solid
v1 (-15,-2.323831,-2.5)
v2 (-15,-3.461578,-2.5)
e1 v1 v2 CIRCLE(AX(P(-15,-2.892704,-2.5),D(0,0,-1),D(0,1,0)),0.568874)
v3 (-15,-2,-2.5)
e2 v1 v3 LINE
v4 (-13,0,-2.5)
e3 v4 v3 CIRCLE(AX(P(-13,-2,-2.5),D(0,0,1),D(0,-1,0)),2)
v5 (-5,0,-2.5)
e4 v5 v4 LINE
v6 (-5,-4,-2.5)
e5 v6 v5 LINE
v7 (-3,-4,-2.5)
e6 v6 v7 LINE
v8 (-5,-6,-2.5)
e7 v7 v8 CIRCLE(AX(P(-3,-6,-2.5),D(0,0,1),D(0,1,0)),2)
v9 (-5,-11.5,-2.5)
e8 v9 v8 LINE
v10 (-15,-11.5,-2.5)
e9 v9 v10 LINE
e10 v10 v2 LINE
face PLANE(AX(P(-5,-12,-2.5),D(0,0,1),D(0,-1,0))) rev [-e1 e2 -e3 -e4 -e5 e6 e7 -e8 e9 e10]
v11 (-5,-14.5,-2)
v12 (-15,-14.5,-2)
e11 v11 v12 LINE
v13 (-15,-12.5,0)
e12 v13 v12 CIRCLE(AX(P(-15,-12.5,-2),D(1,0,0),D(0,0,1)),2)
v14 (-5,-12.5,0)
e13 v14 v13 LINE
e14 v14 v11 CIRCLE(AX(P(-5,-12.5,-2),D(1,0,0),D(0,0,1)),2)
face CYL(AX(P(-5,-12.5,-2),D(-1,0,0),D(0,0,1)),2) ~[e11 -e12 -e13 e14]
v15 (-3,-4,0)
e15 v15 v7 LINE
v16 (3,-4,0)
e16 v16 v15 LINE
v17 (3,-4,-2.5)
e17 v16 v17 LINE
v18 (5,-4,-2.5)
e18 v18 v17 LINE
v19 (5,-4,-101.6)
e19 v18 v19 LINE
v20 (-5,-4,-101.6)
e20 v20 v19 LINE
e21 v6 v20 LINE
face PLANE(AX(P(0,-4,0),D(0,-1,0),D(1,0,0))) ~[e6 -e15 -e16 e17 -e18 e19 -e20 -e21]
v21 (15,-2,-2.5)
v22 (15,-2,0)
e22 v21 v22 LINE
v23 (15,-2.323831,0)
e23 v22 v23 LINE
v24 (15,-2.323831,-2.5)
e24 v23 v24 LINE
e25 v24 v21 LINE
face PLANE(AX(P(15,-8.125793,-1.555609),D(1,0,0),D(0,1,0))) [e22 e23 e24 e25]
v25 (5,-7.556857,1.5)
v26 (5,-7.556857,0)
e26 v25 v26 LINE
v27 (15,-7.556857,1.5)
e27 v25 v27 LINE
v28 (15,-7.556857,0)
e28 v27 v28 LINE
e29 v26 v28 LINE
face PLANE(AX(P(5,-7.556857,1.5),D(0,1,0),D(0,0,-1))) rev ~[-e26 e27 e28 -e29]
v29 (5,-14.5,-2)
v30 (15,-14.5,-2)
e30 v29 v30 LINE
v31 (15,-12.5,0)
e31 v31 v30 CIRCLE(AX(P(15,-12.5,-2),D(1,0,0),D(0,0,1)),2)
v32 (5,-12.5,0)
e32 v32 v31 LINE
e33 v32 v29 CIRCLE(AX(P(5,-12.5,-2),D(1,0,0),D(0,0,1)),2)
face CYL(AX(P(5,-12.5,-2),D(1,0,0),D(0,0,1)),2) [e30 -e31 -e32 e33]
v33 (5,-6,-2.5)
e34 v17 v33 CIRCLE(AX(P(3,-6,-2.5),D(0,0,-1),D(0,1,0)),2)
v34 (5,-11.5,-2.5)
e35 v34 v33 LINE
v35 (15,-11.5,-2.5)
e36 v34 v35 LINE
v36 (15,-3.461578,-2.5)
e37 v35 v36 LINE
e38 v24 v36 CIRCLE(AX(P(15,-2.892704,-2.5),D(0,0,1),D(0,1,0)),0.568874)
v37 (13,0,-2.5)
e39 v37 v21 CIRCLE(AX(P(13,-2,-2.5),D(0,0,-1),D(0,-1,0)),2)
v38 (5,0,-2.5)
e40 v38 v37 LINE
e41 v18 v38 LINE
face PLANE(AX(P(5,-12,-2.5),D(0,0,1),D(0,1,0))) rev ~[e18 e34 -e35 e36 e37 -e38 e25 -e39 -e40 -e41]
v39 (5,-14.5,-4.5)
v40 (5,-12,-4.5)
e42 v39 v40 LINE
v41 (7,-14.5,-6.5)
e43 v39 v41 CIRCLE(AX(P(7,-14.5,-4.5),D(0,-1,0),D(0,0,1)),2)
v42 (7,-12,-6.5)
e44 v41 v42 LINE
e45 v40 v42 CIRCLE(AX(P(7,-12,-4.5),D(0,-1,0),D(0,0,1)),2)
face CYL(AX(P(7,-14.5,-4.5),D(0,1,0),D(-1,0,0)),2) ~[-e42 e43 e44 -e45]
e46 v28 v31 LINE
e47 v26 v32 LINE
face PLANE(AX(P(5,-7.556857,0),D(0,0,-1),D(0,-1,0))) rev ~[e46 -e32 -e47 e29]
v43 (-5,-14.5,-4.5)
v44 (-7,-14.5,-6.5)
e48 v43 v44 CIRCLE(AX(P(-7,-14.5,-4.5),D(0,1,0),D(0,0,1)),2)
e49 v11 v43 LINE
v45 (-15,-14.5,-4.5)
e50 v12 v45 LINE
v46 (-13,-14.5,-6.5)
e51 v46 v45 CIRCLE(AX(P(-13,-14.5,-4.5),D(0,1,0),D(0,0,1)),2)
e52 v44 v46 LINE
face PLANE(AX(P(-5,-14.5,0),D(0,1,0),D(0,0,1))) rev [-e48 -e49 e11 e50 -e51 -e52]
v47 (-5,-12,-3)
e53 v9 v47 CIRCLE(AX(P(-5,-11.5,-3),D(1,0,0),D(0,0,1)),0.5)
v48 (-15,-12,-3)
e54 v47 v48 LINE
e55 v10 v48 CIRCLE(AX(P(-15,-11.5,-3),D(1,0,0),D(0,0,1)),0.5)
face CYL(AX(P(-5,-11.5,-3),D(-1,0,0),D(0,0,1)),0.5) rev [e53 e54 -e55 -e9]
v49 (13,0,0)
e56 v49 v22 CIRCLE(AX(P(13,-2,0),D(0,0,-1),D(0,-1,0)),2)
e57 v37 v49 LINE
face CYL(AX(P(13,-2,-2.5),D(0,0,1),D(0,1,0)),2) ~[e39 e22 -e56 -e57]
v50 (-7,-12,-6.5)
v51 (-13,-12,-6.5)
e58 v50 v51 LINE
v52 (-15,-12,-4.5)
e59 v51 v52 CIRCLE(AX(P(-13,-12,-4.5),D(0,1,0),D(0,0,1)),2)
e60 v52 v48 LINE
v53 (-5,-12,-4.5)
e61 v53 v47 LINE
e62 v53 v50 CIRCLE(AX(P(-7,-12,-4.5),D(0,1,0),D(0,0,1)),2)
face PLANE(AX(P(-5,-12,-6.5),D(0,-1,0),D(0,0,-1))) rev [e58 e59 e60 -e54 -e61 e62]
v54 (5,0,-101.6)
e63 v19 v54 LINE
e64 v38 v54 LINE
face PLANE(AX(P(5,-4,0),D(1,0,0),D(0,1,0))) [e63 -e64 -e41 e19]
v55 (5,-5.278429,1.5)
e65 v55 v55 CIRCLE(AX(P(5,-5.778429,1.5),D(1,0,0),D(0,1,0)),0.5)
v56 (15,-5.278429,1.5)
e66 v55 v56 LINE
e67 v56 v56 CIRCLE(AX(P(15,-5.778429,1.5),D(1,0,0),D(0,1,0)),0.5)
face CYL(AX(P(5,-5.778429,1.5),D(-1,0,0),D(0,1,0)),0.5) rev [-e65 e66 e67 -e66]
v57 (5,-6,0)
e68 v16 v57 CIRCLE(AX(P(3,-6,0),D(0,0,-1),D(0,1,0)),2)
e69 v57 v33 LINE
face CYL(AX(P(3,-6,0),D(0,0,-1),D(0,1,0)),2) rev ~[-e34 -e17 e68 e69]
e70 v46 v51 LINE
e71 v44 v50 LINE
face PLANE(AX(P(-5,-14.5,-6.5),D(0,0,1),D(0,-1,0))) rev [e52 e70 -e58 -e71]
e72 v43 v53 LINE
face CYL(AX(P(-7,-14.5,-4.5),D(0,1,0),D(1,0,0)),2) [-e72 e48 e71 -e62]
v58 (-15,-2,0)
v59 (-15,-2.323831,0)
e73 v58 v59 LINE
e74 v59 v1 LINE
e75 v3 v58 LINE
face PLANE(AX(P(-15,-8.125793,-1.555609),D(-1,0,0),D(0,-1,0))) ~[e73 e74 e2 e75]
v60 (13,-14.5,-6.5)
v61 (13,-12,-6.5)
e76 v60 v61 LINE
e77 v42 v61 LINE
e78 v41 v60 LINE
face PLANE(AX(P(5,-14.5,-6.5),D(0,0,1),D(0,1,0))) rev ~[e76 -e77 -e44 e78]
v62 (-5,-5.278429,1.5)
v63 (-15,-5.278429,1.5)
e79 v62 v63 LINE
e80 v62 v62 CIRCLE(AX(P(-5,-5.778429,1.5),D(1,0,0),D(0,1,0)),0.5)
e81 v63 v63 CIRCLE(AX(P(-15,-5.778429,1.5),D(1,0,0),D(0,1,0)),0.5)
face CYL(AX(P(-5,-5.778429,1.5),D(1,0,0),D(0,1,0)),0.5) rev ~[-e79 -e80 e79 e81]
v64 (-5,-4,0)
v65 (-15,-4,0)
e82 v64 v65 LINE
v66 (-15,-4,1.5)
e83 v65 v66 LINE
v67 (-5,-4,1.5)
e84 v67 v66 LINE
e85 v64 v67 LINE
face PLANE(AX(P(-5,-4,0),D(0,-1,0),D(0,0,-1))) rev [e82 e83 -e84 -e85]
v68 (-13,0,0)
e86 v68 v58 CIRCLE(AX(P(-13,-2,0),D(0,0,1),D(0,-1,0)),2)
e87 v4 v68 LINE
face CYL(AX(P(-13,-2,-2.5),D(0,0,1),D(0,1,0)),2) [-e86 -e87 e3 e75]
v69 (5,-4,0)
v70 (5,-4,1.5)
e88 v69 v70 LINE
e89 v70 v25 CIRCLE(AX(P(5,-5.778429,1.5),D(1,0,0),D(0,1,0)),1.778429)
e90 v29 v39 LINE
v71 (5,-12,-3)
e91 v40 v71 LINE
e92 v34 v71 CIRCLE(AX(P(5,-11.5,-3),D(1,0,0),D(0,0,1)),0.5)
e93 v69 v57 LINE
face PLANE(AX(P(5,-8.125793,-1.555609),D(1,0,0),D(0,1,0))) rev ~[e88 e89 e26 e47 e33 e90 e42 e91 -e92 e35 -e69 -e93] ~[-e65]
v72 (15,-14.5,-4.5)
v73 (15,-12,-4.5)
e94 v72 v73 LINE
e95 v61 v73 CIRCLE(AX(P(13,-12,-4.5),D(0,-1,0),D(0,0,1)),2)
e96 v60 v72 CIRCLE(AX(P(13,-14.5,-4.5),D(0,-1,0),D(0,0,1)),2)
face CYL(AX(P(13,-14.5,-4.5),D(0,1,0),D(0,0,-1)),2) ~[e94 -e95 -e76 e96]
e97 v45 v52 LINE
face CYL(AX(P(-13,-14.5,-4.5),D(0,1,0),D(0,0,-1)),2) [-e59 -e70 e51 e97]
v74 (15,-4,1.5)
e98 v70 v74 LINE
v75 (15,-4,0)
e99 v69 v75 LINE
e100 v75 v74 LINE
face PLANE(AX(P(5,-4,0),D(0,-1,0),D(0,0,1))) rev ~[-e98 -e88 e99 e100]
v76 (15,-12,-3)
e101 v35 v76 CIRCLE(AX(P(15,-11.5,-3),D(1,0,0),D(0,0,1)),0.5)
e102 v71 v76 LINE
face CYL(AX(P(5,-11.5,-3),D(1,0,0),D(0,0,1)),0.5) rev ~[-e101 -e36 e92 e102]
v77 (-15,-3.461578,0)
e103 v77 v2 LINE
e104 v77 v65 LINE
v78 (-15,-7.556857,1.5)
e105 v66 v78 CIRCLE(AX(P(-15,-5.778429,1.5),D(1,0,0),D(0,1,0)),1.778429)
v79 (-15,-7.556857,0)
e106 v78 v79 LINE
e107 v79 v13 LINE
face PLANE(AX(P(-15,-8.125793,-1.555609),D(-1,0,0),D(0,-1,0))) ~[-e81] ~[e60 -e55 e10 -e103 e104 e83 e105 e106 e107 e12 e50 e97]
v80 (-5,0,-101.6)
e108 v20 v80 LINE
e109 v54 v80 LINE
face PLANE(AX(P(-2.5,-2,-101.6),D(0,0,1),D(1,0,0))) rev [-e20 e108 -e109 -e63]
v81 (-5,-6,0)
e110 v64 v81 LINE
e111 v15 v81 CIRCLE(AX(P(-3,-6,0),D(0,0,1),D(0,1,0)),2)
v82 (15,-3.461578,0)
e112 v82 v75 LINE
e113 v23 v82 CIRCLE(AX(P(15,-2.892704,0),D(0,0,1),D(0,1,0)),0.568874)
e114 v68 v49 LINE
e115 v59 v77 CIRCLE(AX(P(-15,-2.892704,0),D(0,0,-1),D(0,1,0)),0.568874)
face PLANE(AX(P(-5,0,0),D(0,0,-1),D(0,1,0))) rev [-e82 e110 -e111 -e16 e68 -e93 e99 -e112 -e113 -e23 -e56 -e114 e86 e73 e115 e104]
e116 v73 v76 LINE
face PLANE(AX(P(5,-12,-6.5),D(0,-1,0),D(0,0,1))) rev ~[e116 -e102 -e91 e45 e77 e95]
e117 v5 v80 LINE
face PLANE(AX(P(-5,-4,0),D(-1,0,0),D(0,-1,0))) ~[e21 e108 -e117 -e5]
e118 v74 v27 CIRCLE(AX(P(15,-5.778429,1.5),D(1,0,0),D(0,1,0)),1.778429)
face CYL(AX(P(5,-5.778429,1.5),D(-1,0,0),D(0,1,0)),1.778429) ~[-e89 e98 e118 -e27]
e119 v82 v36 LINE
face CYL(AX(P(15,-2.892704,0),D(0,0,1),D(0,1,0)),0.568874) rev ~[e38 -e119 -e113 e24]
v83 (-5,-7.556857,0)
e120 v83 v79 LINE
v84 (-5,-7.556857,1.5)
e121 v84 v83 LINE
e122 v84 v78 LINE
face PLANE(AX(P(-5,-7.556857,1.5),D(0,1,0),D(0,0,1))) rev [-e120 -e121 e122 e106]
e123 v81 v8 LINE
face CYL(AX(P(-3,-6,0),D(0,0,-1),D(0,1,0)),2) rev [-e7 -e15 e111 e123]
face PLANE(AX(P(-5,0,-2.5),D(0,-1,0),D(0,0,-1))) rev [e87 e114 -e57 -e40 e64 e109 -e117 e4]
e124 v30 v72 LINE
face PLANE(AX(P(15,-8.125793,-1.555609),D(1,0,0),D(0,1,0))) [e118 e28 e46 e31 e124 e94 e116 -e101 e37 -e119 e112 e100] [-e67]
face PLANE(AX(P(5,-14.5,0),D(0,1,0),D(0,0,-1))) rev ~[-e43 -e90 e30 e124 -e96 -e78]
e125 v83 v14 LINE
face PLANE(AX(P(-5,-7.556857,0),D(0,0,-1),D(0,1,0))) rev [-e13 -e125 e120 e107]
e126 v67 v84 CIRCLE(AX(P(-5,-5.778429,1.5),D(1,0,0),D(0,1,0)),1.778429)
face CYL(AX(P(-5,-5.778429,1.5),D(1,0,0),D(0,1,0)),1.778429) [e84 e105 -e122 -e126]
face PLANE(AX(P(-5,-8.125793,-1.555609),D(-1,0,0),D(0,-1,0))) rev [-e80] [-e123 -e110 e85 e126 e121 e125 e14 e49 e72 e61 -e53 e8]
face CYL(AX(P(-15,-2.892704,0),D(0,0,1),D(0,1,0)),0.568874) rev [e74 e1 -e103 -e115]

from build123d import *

# Parameters (mm, degrees)
F0_W     = 5
F0_H     = 4
F1_DEPTH = 101.6
F2_R     = 0.5
F3_DEPTH = 10
F4_R     = 2
F5_R     = 0.5
F7_DEPTH = 101.601


with BuildPart() as f1:
    # F0 (on Top) → F1 (new body)
    with BuildSketch(Plane.XY):
        with Locations((2.5, -2)):
            Rectangle(F0_W, F0_H)
    extrude(amount=-F1_DEPTH)

    # F2 (on face) → F3 (join)
    with BuildSketch(Plane.YZ.offset(5)):
        with BuildLine():
            Line((0, -2.5), (0, 0))
            Line((0, 0), (-4, 0))
            Line((-4, 0), (-4, 1.5))
            ThreePointArc((-4, 1.5), (-5.7784285378, 3.2784285378), (-7.5568570755, 1.5))
            Line((-7.5568570755, 1.5), (-7.5568570755, 0))
            Line((-7.5568570755, 0), (-14.5, 0))
            Line((-14.5, 0), (-14.5, -6.5))
            Line((-14.5, -6.5), (-12, -6.5))
            Line((-12, -6.5), (-12, -2.5))
            Line((-12, -2.5), (0, -2.5))
        make_face()
        with Locations((-5.7784285378, 1.5)):
            Circle(F2_R, mode=Mode.SUBTRACT)
    extrude(amount=F3_DEPTH)

    # F4
    f4_edges = [f1.edges().sort_by_distance(p)[0] for p in [
        (10, -14.5, 0),
        (5, -4, -1.25),
        (15, 0, -1.25),
        (15, -13.25, -6.5),
        (5, -13.25, -6.5),
    ]]
    fillet(f4_edges, radius=F4_R)

    # F5
    f5_edges = [f1.edges().sort_by_distance(p)[0] for p in [
        (10, -12, -2.5),
    ]]
    fillet(f5_edges, radius=F5_R)

    # F6 (on face) → F7 (cut, through all)
    with BuildSketch(Plane.XY):
        with BuildLine():
            Line((15, -3.4615779296), (15, -2.3238305002))
            ThreePointArc((15, -2.3238305002), (14.4311262853, -2.8927042149), (15, -3.4615779296))
        make_face()
    extrude(amount=-F7_DEPTH, mode=Mode.SUBTRACT)

    # F8: F1 across plane


with BuildPart() as f1_1:
    add(f1.part)
    add(f1.part.mirror(Plane.YZ))


solid = f1_1.part
